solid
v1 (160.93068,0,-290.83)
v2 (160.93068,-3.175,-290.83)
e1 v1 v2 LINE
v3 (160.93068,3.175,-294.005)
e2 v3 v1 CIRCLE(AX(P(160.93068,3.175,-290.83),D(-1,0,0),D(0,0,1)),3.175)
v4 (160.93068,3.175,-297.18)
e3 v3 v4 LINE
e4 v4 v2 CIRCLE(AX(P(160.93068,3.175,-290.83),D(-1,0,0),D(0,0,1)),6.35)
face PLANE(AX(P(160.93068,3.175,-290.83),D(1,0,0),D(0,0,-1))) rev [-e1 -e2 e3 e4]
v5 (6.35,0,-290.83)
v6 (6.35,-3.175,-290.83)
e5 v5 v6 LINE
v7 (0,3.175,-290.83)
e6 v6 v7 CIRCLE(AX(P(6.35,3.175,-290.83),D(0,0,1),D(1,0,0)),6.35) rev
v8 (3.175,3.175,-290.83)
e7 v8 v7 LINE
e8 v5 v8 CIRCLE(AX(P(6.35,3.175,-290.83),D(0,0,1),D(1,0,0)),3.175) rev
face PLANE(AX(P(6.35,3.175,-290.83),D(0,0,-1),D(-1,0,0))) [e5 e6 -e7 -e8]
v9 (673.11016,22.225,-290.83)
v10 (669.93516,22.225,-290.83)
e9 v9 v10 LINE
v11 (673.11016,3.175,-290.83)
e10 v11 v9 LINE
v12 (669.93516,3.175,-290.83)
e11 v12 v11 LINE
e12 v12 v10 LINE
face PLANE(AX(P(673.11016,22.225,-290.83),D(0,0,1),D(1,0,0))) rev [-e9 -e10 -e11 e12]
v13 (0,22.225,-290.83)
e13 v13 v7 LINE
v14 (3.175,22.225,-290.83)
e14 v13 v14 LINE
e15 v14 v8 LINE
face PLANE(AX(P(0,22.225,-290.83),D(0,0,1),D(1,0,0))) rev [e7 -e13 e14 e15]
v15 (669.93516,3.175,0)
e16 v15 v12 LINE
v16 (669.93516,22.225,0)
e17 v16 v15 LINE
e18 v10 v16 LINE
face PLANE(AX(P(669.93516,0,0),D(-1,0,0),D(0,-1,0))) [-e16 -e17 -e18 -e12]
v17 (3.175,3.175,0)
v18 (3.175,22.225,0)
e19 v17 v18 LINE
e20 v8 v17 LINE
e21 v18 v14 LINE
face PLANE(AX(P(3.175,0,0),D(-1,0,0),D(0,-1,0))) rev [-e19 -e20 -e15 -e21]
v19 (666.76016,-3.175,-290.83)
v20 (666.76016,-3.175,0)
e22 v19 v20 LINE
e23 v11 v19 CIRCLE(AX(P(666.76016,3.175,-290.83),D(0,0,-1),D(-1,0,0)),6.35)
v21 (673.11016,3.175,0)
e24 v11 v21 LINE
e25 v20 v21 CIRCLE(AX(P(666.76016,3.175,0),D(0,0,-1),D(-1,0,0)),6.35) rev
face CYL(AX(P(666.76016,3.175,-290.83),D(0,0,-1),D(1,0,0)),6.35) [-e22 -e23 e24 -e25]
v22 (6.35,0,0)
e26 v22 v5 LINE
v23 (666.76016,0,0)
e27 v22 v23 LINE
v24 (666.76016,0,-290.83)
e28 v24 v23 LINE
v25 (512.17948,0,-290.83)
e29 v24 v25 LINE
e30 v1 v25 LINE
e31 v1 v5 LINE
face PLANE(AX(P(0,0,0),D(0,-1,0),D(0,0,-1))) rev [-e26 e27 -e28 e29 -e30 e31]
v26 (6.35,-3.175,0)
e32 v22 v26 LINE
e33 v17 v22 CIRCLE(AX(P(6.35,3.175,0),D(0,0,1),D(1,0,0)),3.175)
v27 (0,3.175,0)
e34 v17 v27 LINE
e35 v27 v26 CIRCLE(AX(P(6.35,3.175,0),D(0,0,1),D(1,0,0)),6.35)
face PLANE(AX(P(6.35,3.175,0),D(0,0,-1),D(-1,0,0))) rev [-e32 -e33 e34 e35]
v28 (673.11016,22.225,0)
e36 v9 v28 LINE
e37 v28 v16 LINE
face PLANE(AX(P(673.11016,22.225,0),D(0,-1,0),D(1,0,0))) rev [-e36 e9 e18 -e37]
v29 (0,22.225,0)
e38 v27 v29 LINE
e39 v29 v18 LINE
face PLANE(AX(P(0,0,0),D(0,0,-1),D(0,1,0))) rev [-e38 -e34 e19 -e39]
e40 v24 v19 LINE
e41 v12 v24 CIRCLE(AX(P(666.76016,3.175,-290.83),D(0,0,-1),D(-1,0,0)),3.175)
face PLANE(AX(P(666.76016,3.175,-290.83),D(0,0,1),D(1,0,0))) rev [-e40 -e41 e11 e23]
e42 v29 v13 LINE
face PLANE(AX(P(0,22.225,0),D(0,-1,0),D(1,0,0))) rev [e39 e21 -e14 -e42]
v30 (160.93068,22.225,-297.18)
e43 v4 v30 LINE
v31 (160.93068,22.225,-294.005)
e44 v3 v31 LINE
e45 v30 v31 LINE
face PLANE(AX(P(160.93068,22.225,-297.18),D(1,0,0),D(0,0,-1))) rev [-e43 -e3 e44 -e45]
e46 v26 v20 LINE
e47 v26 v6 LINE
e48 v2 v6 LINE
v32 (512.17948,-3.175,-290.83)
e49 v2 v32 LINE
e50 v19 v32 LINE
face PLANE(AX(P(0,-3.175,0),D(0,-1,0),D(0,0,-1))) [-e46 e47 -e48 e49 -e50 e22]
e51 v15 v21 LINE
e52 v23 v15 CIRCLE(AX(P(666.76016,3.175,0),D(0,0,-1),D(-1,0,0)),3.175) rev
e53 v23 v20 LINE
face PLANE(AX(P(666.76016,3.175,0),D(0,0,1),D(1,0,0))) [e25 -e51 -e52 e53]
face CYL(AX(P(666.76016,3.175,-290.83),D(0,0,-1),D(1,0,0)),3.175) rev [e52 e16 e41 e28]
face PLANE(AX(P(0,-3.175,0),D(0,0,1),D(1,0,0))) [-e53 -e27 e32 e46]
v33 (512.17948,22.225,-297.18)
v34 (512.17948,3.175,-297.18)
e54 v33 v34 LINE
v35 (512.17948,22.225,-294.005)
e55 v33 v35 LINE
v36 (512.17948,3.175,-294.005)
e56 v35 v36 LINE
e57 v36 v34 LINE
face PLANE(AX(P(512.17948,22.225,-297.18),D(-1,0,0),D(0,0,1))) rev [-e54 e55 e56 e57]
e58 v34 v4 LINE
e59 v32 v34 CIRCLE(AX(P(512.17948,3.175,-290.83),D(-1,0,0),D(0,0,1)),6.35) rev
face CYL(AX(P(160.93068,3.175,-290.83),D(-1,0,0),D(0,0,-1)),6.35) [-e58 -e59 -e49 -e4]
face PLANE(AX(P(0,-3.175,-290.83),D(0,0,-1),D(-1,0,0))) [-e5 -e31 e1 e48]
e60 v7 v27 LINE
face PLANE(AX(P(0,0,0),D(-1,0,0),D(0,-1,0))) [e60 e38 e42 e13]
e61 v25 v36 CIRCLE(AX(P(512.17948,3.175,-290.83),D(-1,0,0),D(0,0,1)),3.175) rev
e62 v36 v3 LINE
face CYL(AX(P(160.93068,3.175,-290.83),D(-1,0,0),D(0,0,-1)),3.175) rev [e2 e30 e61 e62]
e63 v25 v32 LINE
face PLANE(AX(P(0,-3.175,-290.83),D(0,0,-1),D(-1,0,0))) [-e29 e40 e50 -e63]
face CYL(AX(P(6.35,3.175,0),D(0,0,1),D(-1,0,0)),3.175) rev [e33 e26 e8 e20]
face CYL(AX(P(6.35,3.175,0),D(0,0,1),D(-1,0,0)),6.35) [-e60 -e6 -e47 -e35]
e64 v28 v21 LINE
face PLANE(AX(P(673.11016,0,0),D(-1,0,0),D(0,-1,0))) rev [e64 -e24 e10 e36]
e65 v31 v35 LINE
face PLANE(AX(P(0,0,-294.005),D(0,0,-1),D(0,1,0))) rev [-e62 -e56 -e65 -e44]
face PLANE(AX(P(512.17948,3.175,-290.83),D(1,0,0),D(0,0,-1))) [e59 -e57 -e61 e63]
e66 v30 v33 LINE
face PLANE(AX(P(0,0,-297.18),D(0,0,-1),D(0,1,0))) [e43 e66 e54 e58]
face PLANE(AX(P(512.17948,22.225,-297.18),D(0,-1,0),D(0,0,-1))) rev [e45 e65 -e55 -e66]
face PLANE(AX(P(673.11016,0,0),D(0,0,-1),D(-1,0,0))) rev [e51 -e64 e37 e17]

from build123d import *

# Parameters (mm, degrees)
SKETCH1_W                      = 673.11016
SKETCH1_H                      = 290.83
BASE_FLANGE1_DEPTH             = 3.175
EDGE_FLANGE1_DEPTH             = 351.248800168
EDGE_FLANGE2_STRIP_W           = 19.05
EDGE_FLANGE2_STRIP_H           = 3.175
EDGE_FLANGE2_STRIP_CUT_DEPTH   = 290.83
EDGE_FLANGE2_STRIP_2_W         = 19.05
EDGE_FLANGE2_STRIP_2_H         = 3.175
EDGE_FLANGE2_STRIP_CUT_2_DEPTH = 290.83
EDGE_FLANGE2_DEPTH             = 290.83
EDGE_FLANGE2_BEND_DEPTH        = 290.83


# Sheet-metal steps are written as plain solids
with BuildPart() as part:
    # Sketch1 → Base-Flange1 (new body)
    with BuildSketch(Plane(origin=(0, 0, 0), x_dir=(1, 0, 0), z_dir=(0, 1, 0))):
        with Locations((336.55508, 145.415)):
            Rectangle(SKETCH1_W, SKETCH1_H)
    extrude(amount=-BASE_FLANGE1_DEPTH)

    # Edge-Flange1 section (across the edge) → Edge-Flange1 (add)
    with BuildSketch(Plane(origin=(512.179480084, 0, -294.005), x_dir=(0, 0, 1), z_dir=(-1, 0, 0))):
        with BuildLine():
            Line((-3.175, 3.175), (-3.175, 22.225))
            Line((-3.175, 22.225), (0, 22.225))
            Line((0, 22.225), (0, 3.175))
            ThreePointArc((0, 3.175), (0.92993597, 0.92993597), (3.175, 0))
            Line((3.175, 0), (3.175, -3.175))
            ThreePointArc((3.175, -3.175), (-1.315128061, -1.315128061), (-3.175, 3.175))
        make_face()
    extrude(amount=EDGE_FLANGE1_DEPTH)

    # Edge-Flange2 strip (across the edge) → Edge-Flange2 strip cut (cut)
    with BuildSketch(Plane(origin=(673.11016, 0, 0), x_dir=(-1, 0, 0), z_dir=(0, 0, -1))):
        with Locations((-3.175, -1.5875)):
            Rectangle(EDGE_FLANGE2_STRIP_W, EDGE_FLANGE2_STRIP_H)
    extrude(amount=EDGE_FLANGE2_STRIP_CUT_DEPTH, mode=Mode.SUBTRACT)

    # Edge-Flange2 strip 2 (across the edge) → Edge-Flange2 strip cut 2 (cut)
    with BuildSketch(Plane.XY.offset(-290.83)):
        with Locations((-3.175, -1.5875)):
            Rectangle(EDGE_FLANGE2_STRIP_2_W, EDGE_FLANGE2_STRIP_2_H)
    extrude(amount=EDGE_FLANGE2_STRIP_CUT_2_DEPTH, mode=Mode.SUBTRACT)

    # Edge-Flange2 section (across the edge) → Edge-Flange2 (add)
    with BuildSketch(Plane(origin=(673.11016, 0, 0), x_dir=(-1, 0, 0), z_dir=(0, 0, -1))):
        with BuildLine():
            Line((0, 3.175), (0, 22.225))
            Line((0, 22.225), (3.175, 22.225))
            Line((3.175, 22.225), (3.175, 3.175))
            ThreePointArc((3.175, 3.175), (4.10493597, 0.92993597), (6.35, 0))
            Line((6.35, 0), (6.35, -3.175))
            ThreePointArc((6.35, -3.175), (1.859871939, -1.315128061), (0, 3.175))
        make_face()
    extrude(amount=EDGE_FLANGE2_DEPTH)

    # Edge-Flange2 section 2 (across the edge) → Edge-Flange2 bend (add)
    with BuildSketch(Plane.XY.offset(-290.83)):
        with BuildLine():
            Line((0, 3.175), (0, 22.225))
            Line((0, 22.225), (3.175, 22.225))
            Line((3.175, 22.225), (3.175, 3.175))
            ThreePointArc((3.175, 3.175), (4.10493597, 0.92993597), (6.35, 0))
            Line((6.35, 0), (6.35, -3.175))
            ThreePointArc((6.35, -3.175), (1.859871939, -1.315128061), (0, 3.175))
        make_face()
    extrude(amount=EDGE_FLANGE2_BEND_DEPTH)


solid = part.part
